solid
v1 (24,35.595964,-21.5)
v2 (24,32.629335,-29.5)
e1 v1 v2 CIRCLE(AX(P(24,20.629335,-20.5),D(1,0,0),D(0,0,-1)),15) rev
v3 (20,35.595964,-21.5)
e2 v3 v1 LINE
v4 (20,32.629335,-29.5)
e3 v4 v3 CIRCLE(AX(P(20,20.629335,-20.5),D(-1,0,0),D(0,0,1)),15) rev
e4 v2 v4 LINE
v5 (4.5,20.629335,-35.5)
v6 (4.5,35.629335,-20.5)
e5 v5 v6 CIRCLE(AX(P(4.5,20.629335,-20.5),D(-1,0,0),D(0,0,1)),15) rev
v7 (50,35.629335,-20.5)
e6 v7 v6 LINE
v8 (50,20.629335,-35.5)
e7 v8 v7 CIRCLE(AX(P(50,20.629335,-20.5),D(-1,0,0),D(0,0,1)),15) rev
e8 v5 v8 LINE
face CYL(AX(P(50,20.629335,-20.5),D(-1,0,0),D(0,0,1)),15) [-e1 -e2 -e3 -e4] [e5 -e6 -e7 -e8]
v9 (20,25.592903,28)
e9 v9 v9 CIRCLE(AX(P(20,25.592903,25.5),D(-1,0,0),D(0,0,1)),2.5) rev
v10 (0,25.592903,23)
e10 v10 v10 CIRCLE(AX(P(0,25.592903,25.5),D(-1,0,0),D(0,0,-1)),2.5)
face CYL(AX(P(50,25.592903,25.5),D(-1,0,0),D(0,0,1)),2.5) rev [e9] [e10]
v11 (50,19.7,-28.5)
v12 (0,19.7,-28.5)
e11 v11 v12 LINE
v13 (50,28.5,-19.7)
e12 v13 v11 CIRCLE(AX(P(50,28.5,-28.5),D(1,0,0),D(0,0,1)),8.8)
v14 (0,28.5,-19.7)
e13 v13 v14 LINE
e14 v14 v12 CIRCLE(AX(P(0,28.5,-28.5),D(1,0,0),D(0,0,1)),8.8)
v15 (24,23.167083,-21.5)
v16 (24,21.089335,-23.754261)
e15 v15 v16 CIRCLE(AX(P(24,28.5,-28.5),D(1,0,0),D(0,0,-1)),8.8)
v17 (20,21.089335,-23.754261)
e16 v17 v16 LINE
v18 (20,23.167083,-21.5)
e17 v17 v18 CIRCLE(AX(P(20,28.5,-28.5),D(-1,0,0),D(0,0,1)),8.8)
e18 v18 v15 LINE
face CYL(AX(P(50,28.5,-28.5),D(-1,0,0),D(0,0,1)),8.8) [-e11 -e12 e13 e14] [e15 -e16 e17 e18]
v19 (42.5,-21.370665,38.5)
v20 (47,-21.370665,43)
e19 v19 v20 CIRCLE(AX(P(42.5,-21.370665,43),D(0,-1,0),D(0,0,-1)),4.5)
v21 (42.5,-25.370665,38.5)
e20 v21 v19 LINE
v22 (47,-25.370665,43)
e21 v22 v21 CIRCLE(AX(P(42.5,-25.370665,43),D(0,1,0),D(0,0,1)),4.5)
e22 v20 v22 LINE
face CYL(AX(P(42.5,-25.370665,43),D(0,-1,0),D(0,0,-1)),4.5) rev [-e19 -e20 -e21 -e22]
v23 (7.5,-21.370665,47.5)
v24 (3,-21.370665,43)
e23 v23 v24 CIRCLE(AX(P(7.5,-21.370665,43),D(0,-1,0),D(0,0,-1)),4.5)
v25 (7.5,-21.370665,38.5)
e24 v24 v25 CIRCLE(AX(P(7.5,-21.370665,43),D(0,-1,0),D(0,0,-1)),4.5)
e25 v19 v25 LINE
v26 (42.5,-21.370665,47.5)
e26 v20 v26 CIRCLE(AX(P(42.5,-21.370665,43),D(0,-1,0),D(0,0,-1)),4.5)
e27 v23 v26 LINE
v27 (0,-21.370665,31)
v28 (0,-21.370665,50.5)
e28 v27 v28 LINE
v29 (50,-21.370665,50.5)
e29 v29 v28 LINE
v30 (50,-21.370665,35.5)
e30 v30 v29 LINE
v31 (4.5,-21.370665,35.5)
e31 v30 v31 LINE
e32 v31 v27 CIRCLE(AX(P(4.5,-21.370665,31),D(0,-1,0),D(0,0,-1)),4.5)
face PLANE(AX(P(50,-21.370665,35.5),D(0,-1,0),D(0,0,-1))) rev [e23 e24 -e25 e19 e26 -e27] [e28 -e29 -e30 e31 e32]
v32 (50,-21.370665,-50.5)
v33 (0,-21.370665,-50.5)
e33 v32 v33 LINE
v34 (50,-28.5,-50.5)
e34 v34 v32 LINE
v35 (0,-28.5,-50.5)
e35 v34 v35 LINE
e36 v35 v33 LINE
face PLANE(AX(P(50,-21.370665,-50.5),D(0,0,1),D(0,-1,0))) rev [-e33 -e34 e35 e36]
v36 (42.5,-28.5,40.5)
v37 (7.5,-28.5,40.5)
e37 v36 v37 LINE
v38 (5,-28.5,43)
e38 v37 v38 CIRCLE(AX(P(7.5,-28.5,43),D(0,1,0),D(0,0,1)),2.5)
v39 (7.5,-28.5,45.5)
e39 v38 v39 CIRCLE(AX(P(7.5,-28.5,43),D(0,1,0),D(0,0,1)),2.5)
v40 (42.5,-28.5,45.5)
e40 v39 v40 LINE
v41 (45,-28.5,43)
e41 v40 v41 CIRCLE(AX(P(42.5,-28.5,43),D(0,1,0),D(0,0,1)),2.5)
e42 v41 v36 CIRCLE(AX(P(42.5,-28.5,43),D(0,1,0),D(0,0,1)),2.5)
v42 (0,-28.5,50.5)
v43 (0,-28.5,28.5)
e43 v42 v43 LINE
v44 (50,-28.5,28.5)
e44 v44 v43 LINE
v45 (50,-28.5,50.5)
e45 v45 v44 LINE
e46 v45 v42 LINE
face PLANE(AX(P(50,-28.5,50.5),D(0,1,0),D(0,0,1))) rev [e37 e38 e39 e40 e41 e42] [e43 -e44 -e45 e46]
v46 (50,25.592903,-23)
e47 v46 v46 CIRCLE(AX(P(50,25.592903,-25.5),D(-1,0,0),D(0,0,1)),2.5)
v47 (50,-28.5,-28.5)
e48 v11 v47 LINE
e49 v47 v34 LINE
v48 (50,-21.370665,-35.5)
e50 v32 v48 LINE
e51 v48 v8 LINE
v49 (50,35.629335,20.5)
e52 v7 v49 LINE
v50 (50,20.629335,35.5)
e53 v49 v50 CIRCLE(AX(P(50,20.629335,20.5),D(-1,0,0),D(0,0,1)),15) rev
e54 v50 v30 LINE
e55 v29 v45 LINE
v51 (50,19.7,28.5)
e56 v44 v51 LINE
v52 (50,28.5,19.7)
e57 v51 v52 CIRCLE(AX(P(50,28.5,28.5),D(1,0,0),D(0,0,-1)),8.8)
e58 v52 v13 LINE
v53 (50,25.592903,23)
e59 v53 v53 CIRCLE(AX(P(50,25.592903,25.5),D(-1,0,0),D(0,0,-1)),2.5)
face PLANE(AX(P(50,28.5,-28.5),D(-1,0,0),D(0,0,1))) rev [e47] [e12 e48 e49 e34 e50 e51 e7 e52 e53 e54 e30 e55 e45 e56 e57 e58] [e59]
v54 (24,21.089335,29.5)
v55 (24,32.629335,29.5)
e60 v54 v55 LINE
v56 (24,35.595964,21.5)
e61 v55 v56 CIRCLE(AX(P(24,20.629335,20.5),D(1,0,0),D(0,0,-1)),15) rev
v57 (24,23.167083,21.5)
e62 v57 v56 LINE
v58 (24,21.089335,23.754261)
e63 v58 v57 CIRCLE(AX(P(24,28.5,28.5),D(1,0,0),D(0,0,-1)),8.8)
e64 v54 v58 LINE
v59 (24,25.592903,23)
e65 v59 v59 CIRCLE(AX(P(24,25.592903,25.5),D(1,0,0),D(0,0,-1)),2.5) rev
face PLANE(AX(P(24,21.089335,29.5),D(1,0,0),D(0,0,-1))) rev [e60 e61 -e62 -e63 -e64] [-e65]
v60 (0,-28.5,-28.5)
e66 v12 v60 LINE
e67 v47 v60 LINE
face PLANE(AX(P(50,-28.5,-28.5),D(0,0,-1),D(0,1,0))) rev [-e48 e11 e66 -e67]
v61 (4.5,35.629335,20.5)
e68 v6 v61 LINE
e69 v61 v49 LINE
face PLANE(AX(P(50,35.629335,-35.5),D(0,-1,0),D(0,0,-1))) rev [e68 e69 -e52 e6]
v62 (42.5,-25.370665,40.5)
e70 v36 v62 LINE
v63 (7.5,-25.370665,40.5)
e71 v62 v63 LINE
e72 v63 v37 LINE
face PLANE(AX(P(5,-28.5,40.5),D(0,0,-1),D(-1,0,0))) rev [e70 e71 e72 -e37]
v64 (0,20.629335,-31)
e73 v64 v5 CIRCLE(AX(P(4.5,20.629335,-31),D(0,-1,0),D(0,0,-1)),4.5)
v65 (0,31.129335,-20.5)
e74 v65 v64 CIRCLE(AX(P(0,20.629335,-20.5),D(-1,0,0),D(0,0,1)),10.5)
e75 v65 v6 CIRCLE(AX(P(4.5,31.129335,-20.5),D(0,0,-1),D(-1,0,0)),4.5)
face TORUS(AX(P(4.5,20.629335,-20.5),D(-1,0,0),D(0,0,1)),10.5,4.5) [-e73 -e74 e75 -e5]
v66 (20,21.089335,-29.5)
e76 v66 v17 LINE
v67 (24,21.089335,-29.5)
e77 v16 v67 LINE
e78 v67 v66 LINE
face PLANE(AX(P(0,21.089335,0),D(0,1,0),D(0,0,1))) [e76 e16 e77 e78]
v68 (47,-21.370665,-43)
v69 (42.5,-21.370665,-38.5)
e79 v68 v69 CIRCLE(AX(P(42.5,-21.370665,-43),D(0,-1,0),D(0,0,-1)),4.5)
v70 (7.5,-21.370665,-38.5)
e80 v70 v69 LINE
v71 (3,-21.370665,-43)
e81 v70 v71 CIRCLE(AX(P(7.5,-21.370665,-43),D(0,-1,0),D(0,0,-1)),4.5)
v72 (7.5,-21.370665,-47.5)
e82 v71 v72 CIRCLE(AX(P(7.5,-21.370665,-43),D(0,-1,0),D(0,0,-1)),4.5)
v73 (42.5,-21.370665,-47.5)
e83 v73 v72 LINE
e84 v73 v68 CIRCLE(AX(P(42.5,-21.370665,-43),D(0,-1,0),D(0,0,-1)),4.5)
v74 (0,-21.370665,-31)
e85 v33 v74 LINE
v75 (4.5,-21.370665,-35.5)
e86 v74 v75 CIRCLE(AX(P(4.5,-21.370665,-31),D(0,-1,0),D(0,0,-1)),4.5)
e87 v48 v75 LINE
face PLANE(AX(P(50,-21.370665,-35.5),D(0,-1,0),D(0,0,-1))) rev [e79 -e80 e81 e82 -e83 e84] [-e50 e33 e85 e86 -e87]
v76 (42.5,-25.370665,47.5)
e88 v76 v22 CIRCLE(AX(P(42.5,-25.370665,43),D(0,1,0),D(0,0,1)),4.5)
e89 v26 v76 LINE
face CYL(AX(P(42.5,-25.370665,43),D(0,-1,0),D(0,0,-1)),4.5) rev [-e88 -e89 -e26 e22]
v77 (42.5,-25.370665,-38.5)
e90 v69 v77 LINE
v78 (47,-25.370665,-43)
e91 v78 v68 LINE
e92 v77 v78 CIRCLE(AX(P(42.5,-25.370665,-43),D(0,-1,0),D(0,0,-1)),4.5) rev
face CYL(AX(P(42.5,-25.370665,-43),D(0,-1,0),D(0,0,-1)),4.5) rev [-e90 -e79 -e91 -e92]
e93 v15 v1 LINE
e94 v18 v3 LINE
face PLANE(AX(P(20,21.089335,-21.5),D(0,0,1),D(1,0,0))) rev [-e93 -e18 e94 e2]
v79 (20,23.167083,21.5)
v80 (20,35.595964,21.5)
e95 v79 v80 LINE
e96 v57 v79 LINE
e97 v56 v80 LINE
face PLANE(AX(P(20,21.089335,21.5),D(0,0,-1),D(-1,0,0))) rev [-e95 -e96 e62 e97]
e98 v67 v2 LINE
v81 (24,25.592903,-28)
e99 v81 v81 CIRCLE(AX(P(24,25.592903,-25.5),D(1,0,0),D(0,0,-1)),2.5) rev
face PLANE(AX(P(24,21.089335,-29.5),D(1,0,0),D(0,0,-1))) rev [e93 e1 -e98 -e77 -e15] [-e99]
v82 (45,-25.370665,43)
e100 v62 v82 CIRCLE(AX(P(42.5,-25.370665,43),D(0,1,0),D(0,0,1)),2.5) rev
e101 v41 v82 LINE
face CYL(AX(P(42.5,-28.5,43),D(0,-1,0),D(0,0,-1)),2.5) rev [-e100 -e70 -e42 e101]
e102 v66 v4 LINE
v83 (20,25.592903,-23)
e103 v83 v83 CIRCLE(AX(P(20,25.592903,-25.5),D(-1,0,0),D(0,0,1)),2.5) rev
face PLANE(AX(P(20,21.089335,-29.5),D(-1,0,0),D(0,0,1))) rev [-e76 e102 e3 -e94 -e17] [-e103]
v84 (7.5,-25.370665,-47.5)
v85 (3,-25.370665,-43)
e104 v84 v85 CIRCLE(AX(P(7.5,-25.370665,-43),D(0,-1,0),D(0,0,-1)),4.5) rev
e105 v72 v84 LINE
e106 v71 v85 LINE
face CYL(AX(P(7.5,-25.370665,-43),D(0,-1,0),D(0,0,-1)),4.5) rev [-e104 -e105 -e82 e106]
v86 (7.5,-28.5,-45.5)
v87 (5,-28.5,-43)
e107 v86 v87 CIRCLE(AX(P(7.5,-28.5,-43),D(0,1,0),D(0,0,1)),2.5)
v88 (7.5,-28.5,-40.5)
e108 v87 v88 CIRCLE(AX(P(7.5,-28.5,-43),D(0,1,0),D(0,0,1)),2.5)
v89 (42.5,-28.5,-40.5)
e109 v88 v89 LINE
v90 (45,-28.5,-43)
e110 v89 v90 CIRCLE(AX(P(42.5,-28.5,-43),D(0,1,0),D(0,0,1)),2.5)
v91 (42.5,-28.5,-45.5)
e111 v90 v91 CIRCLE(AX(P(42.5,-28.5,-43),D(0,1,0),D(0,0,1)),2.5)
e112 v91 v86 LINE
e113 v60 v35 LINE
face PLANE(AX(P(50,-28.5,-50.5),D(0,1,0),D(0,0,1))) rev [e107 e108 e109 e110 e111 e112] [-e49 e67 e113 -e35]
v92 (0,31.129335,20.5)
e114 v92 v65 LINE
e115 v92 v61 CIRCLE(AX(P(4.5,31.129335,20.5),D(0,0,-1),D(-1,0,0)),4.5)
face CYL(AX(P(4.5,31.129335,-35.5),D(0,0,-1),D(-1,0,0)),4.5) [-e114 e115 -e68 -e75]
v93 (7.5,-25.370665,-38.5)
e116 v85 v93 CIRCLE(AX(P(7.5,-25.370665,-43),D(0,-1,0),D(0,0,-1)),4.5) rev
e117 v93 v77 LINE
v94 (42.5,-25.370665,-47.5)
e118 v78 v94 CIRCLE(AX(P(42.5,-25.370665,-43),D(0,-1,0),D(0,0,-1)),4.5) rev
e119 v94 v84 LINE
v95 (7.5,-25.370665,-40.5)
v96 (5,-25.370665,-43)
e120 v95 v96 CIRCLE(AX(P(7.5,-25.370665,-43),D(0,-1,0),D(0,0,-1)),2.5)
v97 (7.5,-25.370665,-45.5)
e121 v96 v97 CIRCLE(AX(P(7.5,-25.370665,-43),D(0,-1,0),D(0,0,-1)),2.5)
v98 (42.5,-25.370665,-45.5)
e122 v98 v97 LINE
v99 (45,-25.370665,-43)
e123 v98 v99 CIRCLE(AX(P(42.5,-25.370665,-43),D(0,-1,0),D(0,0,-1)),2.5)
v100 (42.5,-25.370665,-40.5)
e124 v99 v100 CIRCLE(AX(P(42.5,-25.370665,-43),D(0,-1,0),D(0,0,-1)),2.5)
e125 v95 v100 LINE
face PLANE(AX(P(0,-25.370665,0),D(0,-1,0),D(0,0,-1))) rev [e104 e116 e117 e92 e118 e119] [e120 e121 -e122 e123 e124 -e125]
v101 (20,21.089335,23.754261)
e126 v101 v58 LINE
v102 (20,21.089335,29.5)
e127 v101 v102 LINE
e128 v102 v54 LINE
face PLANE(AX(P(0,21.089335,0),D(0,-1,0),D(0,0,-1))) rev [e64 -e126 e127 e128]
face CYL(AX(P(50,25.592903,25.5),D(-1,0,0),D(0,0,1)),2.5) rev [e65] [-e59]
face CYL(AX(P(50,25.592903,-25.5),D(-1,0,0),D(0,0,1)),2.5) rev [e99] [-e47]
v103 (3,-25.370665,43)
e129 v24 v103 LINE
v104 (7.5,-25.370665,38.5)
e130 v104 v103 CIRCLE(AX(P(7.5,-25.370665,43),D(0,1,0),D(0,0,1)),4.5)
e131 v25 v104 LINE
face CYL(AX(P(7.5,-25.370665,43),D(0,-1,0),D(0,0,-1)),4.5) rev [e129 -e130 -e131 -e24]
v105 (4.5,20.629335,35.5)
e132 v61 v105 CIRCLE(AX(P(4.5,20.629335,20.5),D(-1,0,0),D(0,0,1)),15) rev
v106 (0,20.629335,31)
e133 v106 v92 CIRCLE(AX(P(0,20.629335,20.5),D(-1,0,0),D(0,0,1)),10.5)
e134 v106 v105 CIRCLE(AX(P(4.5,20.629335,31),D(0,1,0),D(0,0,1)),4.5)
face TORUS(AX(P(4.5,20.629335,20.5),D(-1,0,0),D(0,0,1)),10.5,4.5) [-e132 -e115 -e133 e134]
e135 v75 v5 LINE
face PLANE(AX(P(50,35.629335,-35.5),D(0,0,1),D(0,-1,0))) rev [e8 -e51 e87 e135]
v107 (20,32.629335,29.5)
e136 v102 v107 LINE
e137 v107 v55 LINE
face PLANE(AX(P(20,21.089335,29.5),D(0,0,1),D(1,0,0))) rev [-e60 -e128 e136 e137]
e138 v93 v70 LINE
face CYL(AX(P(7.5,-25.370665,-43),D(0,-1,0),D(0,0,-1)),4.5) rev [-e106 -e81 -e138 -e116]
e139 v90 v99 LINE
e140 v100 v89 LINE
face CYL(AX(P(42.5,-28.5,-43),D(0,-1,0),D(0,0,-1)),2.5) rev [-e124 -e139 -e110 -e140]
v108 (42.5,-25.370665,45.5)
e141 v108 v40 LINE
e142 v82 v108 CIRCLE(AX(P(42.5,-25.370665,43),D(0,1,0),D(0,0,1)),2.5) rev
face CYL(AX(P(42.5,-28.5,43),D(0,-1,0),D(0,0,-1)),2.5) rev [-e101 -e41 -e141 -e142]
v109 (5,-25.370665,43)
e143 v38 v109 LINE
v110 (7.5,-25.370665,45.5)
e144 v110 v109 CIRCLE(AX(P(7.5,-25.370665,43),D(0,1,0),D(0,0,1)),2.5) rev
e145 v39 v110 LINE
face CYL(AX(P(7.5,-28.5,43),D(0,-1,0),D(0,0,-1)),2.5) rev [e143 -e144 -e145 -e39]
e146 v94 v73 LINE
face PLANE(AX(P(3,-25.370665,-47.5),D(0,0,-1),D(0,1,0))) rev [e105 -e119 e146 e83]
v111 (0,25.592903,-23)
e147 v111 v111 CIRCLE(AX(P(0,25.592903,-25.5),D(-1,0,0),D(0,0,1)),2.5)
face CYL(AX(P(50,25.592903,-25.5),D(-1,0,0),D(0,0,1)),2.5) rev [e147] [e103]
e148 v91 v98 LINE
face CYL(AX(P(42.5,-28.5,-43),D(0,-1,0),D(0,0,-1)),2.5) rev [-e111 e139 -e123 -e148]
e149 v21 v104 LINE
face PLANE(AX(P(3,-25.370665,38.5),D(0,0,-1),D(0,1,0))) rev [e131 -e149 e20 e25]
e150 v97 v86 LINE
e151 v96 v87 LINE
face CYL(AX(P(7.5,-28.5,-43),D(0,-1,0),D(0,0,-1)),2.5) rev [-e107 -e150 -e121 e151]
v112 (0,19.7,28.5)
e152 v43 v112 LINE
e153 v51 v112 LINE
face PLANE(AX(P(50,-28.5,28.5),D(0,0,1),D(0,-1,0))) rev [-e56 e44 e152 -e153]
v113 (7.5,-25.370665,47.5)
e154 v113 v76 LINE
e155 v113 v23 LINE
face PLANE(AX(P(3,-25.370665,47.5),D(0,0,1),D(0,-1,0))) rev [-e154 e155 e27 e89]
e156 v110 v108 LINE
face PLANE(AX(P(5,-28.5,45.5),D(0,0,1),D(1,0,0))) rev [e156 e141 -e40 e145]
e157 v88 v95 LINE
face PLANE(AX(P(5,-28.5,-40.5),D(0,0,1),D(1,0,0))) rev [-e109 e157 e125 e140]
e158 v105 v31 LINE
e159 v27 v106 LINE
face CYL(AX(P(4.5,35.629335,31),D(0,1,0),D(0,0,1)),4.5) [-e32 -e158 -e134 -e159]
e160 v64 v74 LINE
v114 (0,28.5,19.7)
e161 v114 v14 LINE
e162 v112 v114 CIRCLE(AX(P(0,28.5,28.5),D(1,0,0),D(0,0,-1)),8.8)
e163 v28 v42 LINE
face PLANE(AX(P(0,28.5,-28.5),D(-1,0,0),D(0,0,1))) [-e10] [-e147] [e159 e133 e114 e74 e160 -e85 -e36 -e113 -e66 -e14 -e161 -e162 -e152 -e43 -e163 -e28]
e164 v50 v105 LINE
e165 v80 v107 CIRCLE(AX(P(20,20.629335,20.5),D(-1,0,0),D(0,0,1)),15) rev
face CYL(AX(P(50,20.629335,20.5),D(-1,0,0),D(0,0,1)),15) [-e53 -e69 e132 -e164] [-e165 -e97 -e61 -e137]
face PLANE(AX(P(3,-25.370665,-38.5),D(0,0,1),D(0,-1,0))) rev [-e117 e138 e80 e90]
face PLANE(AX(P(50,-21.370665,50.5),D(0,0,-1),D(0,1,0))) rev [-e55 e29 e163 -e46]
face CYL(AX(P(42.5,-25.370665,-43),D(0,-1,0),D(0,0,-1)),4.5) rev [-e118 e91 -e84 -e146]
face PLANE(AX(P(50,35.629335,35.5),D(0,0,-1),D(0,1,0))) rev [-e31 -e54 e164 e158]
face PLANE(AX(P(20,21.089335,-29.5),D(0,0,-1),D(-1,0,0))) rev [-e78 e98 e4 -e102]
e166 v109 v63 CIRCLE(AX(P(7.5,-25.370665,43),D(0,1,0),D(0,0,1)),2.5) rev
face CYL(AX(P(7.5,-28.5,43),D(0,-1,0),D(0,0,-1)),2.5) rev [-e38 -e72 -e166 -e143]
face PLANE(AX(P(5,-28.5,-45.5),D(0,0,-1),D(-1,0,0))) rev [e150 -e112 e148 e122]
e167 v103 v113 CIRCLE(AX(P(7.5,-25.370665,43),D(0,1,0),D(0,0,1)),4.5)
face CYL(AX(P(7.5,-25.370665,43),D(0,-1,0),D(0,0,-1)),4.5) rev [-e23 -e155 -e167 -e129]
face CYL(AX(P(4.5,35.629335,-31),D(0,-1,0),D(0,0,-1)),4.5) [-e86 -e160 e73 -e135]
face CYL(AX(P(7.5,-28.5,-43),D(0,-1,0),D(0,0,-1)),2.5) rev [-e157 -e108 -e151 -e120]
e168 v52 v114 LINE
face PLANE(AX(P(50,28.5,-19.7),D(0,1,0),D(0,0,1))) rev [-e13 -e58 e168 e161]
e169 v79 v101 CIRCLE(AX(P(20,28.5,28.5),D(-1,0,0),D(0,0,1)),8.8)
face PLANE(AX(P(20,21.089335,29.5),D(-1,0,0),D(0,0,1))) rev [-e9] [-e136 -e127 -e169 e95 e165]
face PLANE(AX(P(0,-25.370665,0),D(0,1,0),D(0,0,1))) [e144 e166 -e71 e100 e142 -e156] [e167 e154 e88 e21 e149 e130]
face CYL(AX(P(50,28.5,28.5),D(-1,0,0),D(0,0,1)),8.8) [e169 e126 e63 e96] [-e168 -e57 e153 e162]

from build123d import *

# Parameters (mm, degrees)
BOSS_EXTRUDE1_DEPTH = 50
SKETCH2_R           = 2.5
CUT_EXTRUDE1_DEPTH  = 50
FILLET1_R           = 15
SKETCH3_W           = 4
SKETCH3_H           = 8
CUT_EXTRUDE2_DEPTH  = 14.54
SKETCH4_W           = 44
SKETCH4_H           = 9
CUT_EXTRUDE3_DEPTH  = 4
SKETCH5_W           = 40
SKETCH5_H           = 5
CUT_EXTRUDE4_DEPTH  = 94.654951818
FILLET2_R           = 2.5
FILLET3_R           = 4.5
FILLET4_R           = 4.5


with BuildPart() as part:
    # Sketch1 → Boss-Extrude1 (new body)
    with BuildSketch(Plane(origin=(0, 0, 0), x_dir=(0, 0, -1), z_dir=(1, 0, 0))):
        with BuildLine():
            Line((35.5, 35.62933491), (-35.5, 35.62933491))
            Line((-35.5, 35.62933491), (-35.5, -21.37066509))
            Line((-35.5, -21.37066509), (-50.5, -21.37066509))
            Line((-50.5, -21.37066509), (-50.5, -28.5))
            Line((-50.5, -28.5), (-28.5, -28.5))
            Line((-28.5, -28.5), (-28.5, 19.7))
            ThreePointArc((-28.5, 19.7), (-22.277460326, 22.277460326), (-19.7, 28.5))
            Line((-19.7, 28.5), (19.7, 28.5))
            ThreePointArc((19.7, 28.5), (22.277460326, 22.277460326), (28.5, 19.7))
            Line((28.5, 19.7), (28.5, -28.5))
            Line((28.5, -28.5), (50.5, -28.5))
            Line((50.5, -28.5), (50.5, -21.37066509))
            Line((50.5, -21.37066509), (35.5, -21.37066509))
            Line((35.5, -21.37066509), (35.5, 35.62933491))
        make_face()
    extrude(amount=BOSS_EXTRUDE1_DEPTH)

    # Sketch2 → Cut-Extrude1 (cut)
    with BuildSketch(Plane.ZY):
        with Locations((-25.5, 25.592902541)):
            Circle(SKETCH2_R)
        with Locations(Location((25.5, 25.592902541, 0), (0, 0, 180))):
            Circle(SKETCH2_R)
    extrude(amount=-CUT_EXTRUDE1_DEPTH, mode=Mode.SUBTRACT)

    # Fillet1
    fillet1_edges = [part.edges().sort_by_distance(p)[0] for p in [
        (25, 35.62933491, 35.5),
        (25, 35.62933491, -35.5),
    ]]
    fillet(fillet1_edges, radius=FILLET1_R)

    # Sketch3 → Cut-Extrude2 (cut)
    with BuildSketch(Plane(origin=(0, 35.62933491, 0), x_dir=(1, 0, 0), z_dir=(0, 1, 0))):
        with Locations((22, 25.5)):
            Rectangle(SKETCH3_W, SKETCH3_H)
        with Locations((22, -25.5)):
            Rectangle(SKETCH3_W, SKETCH3_H)
    extrude(amount=-CUT_EXTRUDE2_DEPTH, mode=Mode.SUBTRACT)

    # Sketch4 → Cut-Extrude3 (cut)
    with BuildSketch(Plane(origin=(0, -21.37066509, 0), x_dir=(1, 0, 0), z_dir=(0, 1, 0))):
        with Locations((25, -43)):
            Rectangle(SKETCH4_W, SKETCH4_H)
        with Locations((25, 43)):
            Rectangle(SKETCH4_W, SKETCH4_H)
    extrude(amount=-CUT_EXTRUDE3_DEPTH, mode=Mode.SUBTRACT)

    # Sketch5 → Cut-Extrude4 (cut, through all)
    with BuildSketch(Plane(origin=(0, -25.37066509, 0), x_dir=(1, 0, 0), z_dir=(0, 1, 0))):
        with Locations((25, -43)):
            Rectangle(SKETCH5_W, SKETCH5_H)
        with Locations((25, 43)):
            Rectangle(SKETCH5_W, SKETCH5_H)
    extrude(amount=-CUT_EXTRUDE4_DEPTH, mode=Mode.SUBTRACT)

    # Fillet2
    fillet2_edges = [part.edges().sort_by_distance(p)[0] for p in [
        (45, -26.935332545, 40.5),
        (45, -26.935332545, 45.5),
        (5, -26.935332545, 45.5),
        (5, -26.935332545, 40.5),
        (5, -26.935332545, -45.5),
        (5, -26.935332545, -40.5),
        (45, -26.935332545, -45.5),
        (45, -26.935332545, -40.5),
    ]]
    fillet(fillet2_edges, radius=FILLET2_R - 0.0001)  # a hair under: the kernel refuses the full size

    # Fillet3
    fillet3_edges = [part.edges().sort_by_distance(p)[0] for p in [
        (3, -23.37066509, 38.5),
        (3, -23.37066509, 47.5),
        (47, -23.37066509, 47.5),
        (47, -23.37066509, 38.5),
        (47, -23.37066509, -47.5),
        (47, -23.37066509, -38.5),
        (3, -23.37066509, -47.5),
        (3, -23.37066509, -38.5),
    ]]
    fillet(fillet3_edges, radius=FILLET3_R - 0.0001)  # a hair under: the kernel refuses the full size

    # Fillet4
    fillet4_edges = [part.edges().sort_by_distance(p)[0] for p in [
        (0, -0.37066509, -35.5),
        (0, -0.37066509, 35.5),
        (0, 35.62933491, 0),
        (0, 31.235936628, -31.106601718),
        (0, 31.235936628, 31.106601718),
    ]]
    fillet(fillet4_edges, radius=FILLET4_R)


solid = part.part
